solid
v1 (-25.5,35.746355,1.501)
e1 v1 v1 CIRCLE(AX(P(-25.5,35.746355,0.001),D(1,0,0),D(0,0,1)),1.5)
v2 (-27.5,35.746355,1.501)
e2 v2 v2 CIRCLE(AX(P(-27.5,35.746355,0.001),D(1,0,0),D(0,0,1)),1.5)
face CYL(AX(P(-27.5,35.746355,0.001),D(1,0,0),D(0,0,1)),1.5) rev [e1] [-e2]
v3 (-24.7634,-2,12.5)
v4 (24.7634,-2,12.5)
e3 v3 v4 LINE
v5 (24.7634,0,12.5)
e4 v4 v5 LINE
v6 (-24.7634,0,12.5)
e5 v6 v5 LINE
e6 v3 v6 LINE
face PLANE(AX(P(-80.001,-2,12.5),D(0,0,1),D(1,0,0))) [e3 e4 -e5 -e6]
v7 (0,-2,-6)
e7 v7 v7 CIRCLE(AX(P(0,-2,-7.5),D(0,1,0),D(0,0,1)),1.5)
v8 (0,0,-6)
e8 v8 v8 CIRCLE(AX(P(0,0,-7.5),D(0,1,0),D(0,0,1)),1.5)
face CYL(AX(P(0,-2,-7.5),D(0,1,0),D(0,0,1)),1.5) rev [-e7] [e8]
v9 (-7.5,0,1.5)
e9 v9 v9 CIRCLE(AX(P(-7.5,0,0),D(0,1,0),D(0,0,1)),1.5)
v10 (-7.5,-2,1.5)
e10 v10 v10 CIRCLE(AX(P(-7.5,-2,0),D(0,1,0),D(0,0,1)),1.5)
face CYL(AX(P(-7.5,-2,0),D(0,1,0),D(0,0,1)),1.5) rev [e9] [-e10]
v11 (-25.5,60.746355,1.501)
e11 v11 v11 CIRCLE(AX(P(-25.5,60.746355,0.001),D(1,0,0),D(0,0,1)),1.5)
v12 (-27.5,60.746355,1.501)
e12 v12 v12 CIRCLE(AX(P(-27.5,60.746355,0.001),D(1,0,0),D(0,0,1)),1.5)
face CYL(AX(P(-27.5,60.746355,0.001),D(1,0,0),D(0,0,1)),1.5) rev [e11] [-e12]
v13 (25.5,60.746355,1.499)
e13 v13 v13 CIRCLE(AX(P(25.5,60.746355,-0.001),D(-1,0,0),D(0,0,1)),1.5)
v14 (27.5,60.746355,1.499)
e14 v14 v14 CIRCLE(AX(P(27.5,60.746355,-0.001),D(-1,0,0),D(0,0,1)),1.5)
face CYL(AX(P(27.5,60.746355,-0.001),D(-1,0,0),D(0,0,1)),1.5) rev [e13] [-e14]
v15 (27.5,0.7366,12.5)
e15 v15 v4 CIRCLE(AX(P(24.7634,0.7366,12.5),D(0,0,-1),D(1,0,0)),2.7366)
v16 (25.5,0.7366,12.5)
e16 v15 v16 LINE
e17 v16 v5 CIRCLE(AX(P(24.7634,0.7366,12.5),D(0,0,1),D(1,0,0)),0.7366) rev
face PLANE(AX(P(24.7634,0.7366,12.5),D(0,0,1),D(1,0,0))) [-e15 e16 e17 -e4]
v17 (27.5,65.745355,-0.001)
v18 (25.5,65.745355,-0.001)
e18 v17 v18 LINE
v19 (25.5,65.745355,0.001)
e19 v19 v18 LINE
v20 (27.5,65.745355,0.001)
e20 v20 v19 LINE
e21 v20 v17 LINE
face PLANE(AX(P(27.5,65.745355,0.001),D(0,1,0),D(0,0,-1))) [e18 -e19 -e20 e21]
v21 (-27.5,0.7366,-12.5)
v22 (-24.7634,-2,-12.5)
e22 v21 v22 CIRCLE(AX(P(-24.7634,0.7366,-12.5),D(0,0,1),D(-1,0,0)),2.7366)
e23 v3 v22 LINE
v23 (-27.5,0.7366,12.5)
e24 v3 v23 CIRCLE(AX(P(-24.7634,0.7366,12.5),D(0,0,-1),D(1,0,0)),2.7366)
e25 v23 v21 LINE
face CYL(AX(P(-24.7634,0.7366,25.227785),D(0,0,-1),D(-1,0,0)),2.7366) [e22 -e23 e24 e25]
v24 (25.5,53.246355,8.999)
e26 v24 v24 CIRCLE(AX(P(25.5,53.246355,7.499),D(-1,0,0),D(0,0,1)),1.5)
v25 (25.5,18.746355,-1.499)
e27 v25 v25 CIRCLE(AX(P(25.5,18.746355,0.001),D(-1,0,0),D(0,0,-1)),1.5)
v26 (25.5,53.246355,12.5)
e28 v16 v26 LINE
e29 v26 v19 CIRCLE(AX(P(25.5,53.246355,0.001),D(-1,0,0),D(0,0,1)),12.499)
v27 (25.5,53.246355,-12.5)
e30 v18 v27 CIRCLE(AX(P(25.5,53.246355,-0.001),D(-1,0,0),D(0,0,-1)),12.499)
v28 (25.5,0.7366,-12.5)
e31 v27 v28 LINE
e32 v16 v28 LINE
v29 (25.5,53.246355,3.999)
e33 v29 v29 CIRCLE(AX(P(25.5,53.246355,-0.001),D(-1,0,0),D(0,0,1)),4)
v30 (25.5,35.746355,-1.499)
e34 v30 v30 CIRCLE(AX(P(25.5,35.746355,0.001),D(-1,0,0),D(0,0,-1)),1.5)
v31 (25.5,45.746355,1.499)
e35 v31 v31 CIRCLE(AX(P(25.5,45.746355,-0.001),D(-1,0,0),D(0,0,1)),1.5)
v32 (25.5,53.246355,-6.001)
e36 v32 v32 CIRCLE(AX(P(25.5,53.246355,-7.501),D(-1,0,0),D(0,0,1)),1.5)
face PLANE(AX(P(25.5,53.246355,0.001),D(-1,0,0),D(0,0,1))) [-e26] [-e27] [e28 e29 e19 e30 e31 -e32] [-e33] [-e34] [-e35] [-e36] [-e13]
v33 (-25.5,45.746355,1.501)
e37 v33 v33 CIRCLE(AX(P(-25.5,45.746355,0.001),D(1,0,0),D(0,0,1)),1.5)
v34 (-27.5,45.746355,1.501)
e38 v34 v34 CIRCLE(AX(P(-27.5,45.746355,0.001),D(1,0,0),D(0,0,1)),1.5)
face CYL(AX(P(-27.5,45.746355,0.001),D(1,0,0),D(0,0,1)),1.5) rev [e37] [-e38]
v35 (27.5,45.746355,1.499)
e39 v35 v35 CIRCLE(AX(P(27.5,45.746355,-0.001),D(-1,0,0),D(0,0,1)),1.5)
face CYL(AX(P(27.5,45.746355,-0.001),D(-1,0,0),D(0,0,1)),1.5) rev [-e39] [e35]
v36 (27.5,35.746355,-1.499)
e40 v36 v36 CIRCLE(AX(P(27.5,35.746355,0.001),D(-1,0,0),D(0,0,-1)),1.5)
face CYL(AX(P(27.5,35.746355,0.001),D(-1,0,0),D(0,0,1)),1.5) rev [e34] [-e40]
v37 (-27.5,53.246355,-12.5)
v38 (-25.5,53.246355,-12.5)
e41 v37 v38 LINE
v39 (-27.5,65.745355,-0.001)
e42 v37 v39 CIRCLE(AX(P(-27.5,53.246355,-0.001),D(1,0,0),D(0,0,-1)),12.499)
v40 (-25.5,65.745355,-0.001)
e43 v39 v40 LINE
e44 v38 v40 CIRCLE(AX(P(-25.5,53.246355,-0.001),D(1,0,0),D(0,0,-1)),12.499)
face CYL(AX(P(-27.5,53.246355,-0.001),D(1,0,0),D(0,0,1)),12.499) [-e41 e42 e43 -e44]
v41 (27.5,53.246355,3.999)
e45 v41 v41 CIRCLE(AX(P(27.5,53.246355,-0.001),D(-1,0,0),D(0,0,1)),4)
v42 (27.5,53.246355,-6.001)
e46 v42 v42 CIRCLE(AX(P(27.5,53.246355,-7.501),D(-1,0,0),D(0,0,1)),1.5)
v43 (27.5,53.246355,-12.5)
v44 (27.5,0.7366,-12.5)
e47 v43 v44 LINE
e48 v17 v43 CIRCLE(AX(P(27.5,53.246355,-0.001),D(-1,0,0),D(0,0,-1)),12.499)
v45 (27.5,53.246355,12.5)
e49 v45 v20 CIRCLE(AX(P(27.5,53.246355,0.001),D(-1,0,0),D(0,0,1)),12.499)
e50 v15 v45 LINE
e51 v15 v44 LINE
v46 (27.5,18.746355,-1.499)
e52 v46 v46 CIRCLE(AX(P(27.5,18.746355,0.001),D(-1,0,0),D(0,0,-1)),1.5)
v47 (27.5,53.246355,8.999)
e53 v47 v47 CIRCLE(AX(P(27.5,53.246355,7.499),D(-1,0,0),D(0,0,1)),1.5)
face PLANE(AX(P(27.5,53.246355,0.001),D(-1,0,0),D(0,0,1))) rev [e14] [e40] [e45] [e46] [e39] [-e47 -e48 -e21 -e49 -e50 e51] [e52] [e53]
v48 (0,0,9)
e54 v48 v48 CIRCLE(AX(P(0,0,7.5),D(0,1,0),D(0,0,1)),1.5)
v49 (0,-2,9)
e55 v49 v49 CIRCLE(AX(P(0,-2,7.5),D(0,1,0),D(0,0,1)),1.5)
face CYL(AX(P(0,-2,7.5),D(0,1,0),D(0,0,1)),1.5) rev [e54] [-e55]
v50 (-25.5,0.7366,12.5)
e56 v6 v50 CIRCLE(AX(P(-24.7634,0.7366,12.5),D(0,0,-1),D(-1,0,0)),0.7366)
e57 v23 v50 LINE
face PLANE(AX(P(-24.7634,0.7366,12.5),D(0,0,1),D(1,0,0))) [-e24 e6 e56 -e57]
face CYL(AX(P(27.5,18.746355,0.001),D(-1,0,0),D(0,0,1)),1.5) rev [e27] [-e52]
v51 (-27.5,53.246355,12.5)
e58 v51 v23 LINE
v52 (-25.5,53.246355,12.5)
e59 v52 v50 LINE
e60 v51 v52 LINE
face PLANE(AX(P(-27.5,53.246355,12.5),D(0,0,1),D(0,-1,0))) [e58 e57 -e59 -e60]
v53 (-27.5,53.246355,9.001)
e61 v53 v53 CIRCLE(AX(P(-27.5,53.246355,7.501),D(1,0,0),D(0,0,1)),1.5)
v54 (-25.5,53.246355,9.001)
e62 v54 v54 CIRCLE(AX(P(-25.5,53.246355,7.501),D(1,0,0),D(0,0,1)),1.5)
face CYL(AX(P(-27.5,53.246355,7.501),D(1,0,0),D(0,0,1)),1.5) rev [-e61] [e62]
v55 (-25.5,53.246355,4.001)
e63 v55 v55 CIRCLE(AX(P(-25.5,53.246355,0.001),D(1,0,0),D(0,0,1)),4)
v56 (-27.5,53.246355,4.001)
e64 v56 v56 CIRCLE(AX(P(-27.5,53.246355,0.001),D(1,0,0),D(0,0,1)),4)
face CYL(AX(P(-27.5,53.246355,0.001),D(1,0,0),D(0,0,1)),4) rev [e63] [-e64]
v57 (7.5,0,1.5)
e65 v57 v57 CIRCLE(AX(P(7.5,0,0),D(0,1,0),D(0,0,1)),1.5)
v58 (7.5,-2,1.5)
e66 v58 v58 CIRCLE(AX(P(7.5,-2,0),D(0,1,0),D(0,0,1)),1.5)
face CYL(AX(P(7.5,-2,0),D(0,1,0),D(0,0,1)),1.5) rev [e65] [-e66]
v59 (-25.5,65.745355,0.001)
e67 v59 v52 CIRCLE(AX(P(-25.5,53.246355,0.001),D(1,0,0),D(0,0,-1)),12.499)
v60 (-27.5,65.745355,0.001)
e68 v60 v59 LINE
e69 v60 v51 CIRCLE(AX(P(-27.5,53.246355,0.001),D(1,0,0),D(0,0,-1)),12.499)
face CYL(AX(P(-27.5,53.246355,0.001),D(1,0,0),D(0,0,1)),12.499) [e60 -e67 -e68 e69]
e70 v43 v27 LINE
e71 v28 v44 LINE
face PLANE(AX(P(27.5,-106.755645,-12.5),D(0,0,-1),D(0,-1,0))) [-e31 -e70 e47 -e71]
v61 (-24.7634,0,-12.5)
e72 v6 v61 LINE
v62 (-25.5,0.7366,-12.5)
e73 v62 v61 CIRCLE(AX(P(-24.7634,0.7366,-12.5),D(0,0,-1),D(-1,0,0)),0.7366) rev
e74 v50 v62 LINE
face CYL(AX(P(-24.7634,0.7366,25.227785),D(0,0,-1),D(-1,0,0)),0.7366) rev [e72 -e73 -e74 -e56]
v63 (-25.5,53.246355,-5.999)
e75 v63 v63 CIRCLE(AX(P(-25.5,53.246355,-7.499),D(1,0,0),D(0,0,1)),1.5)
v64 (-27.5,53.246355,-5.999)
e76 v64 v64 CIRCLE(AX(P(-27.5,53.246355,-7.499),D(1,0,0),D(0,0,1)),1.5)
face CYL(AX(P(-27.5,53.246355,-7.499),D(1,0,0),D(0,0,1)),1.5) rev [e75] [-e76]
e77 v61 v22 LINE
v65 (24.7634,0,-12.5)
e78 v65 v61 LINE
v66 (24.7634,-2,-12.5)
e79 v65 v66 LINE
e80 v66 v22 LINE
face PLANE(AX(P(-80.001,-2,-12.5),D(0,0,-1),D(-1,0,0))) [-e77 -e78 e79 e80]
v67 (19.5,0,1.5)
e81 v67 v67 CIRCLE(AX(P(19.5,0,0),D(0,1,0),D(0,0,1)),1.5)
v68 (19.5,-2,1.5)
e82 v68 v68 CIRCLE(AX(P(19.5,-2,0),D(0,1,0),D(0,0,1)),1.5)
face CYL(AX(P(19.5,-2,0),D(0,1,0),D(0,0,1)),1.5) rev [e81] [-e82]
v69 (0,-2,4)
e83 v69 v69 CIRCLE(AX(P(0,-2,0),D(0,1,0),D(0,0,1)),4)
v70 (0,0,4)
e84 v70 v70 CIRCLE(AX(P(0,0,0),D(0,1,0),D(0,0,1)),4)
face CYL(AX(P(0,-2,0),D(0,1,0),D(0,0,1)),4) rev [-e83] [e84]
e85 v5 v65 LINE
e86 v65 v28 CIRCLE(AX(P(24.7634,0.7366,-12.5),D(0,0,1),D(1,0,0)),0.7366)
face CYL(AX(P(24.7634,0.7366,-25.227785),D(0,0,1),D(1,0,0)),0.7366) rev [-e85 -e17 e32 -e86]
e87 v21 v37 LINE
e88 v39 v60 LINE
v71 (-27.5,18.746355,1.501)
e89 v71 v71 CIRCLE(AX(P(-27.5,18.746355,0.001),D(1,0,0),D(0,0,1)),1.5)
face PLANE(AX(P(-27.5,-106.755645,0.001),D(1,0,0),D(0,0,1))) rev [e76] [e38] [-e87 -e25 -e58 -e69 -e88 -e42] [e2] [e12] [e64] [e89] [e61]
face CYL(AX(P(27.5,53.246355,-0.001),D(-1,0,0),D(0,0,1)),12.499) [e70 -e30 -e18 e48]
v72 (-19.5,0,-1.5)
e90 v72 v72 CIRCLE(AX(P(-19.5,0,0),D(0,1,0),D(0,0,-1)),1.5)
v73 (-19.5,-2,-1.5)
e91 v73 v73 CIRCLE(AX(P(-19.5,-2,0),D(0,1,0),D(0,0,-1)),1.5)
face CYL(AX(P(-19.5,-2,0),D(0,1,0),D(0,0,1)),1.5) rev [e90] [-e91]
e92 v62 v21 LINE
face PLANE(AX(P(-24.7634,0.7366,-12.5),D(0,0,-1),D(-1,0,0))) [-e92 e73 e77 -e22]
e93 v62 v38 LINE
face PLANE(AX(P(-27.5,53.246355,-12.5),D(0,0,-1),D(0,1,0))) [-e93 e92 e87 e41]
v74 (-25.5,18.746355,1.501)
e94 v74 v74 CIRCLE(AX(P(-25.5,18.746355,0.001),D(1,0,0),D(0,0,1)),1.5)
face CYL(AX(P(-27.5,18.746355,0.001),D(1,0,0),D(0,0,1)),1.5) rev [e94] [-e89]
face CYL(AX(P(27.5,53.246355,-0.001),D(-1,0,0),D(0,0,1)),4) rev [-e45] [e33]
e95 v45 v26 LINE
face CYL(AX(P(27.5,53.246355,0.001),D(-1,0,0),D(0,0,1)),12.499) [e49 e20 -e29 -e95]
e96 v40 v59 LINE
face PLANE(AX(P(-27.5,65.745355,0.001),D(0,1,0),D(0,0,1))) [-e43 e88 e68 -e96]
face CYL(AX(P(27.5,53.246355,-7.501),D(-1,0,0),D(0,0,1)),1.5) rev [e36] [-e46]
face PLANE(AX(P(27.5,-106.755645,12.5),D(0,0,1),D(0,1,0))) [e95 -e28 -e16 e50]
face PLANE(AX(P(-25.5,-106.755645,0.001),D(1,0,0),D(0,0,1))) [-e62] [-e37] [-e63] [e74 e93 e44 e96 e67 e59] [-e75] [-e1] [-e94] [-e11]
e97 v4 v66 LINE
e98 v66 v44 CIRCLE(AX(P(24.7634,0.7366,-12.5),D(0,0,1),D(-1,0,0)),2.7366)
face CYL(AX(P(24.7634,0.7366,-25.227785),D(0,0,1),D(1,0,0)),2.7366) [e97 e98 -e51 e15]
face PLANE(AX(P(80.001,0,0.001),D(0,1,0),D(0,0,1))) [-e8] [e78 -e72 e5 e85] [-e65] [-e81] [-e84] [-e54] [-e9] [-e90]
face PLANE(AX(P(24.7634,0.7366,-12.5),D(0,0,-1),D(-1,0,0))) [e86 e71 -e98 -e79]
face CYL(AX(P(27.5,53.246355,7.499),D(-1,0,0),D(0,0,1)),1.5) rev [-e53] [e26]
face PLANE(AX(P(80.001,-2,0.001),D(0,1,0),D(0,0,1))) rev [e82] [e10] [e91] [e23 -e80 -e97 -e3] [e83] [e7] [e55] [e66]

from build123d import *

# Parameters (mm, degrees)
SKETCH1_R                  = 4
SKETCH1_R_2                = 1.5
BASE_FLANGE1_DEPTH         = 2
SKETCHED_START             = -92.5
SKETCHED_BEND1_OUTLINE_W   = 2
SKETCHED_BEND1_OUTLINE_H   = 25
SKETCHED_BEND1_DEPTH       = 65
SKETCHED_START_2           = 27.5
SKETCHED_BEND1_2_OUTLINE_W = 2
SKETCHED_BEND1_2_OUTLINE_H = 25
SKETCHED_BEND1_2_DEPTH     = 65
SKETCHED_START_3           = -27.5
SKETCHED_BEND1_3_OUTLINE_R = 1.5
SKETCHED_BEND1_3_DEPTH     = 2.7366
SKETCHED_START_4           = 24.7634
SKETCHED_BEND1_4_OUTLINE_R = 1.5
SKETCHED_BEND1_4_DEPTH     = 2.7366
SKETCHED_BEND1_5_DEPTH     = 2
SKETCHED_START_5           = 25.5
SKETCHED_BEND1_6_DEPTH     = 2
SKETCHED_START_6           = -12.5
SKETCHED_BEND1_7_DEPTH     = 25


with BuildPart() as part:
    # Base-Flange1: sheet metal written as solids
    # Sketch1 → Base-Flange1 (new body)
    with BuildSketch(Plane(origin=(0, 0, 0), x_dir=(1, 0, 0), z_dir=(0, 1, 0))):
        with BuildLine():
            Line((-92.5, -0.001), (-92.5, 0.001))
            ThreePointArc((-92.5, 0.001), (-88.839127658, 8.839127658), (-80.001, 12.5))
            Line((-80.001, 12.5), (80.001, 12.5))
            ThreePointArc((80.001, 12.5), (88.839127658, 8.839127658), (92.5, 0.001))
            Line((92.5, 0.001), (92.5, -0.001))
            ThreePointArc((92.5, -0.001), (88.839127658, -8.839127658), (80.001, -12.5))
            Line((80.001, -12.5), (-80.001, -12.5))
            ThreePointArc((-80.001, -12.5), (-88.839127658, -8.839127658), (-92.5, -0.001))
        make_face()
        with Locations(Location((0, 0, 0), (0, 0, 270))):
            Circle(SKETCH1_R, mode=Mode.SUBTRACT)
        with Locations(Location((0, 7.5, 0), (0, 0, 270))):
            Circle(SKETCH1_R_2, mode=Mode.SUBTRACT)
        with Locations(Location((7.5, 0, 0), (0, 0, 270))):
            Circle(SKETCH1_R_2, mode=Mode.SUBTRACT)
        with Locations(Location((0, -7.5, 0), (0, 0, 270))):
            Circle(SKETCH1_R_2, mode=Mode.SUBTRACT)
        with Locations(Location((-7.5, 0, 0), (0, 0, 270))):
            Circle(SKETCH1_R_2, mode=Mode.SUBTRACT)
        with Locations(Location((72.501, 0.001, 0), (0, 0, 270))):
            Circle(SKETCH1_R_2, mode=Mode.SUBTRACT)
        with Locations(Location((80.001, 0.001, 0), (0, 0, 270))):
            Circle(SKETCH1_R, mode=Mode.SUBTRACT)
        with Locations(Location((80.001, -7.499, 0), (0, 0, 270))):
            Circle(SKETCH1_R_2, mode=Mode.SUBTRACT)
        with Locations(Location((87.501, 0.001, 0), (0, 0, 270))):
            Circle(SKETCH1_R_2, mode=Mode.SUBTRACT)
        with Locations(Location((80.001, 7.501, 0), (0, 0, 270))):
            Circle(SKETCH1_R_2, mode=Mode.SUBTRACT)
        with Locations(Location((-80.001, 7.499, 0), (0, 0, 270))):
            Circle(SKETCH1_R_2, mode=Mode.SUBTRACT)
        with Locations(Location((-87.501, -0.001, 0), (0, 0, 270))):
            Circle(SKETCH1_R_2, mode=Mode.SUBTRACT)
        with Locations(Location((-80.001, -0.001, 0), (0, 0, 270))):
            Circle(SKETCH1_R, mode=Mode.SUBTRACT)
        with Locations(Location((-72.501, -0.001, 0), (0, 0, 270))):
            Circle(SKETCH1_R_2, mode=Mode.SUBTRACT)
        with Locations(Location((-80.001, -7.501, 0), (0, 0, 270))):
            Circle(SKETCH1_R_2, mode=Mode.SUBTRACT)
        with Locations(Location((-62.501, -0.001, 0), (0, 0, 270))):
            Circle(SKETCH1_R_2, mode=Mode.SUBTRACT)
        with Locations(Location((-45.501, -0.001, 0), (0, 0, 270))):
            Circle(SKETCH1_R_2, mode=Mode.SUBTRACT)
        with Locations(Location((45.501, -0.001, 0), (0, 0, 90))):
            Circle(SKETCH1_R_2, mode=Mode.SUBTRACT)
        with Locations(Location((62.501, -0.001, 0), (0, 0, 90))):
            Circle(SKETCH1_R_2, mode=Mode.SUBTRACT)
        with Locations(Location((19.5, 0, 0), (0, 0, 270))):
            Circle(SKETCH1_R_2, mode=Mode.SUBTRACT)
        with Locations(Location((-19.5, 0, 0), (0, 0, 90))):
            Circle(SKETCH1_R_2, mode=Mode.SUBTRACT)
    extrude(amount=-BASE_FLANGE1_DEPTH)

    # Sketched Bend1: read off the stored shape, not the designer's step
    # Sketched Bend1 outline → Sketched Bend1 (cut)
    with BuildSketch(Plane.YZ.offset(SKETCHED_START)):
        with Locations((-1, 0)):
            Rectangle(SKETCHED_BEND1_OUTLINE_W, SKETCHED_BEND1_OUTLINE_H)
    extrude(amount=SKETCHED_BEND1_DEPTH, mode=Mode.SUBTRACT)

    # Sketched Bend1 2 outline → Sketched Bend1 2 (cut)
    with BuildSketch(Plane.YZ.offset(SKETCHED_START_2)):
        with Locations((-1, 0)):
            Rectangle(SKETCHED_BEND1_2_OUTLINE_W, SKETCHED_BEND1_2_OUTLINE_H)
    extrude(amount=SKETCHED_BEND1_2_DEPTH, mode=Mode.SUBTRACT)

    # Sketched Bend1 3 outline → Sketched Bend1 3 (add)
    with BuildSketch(Plane.YZ.offset(SKETCHED_START_3)):
        with BuildLine():
            Line((0, 12.5), (0, -12.5))
            Line((0, -12.5), (53.246355099, -12.5))
            ThreePointArc((53.246355099, -12.5), (62.084482757, -8.839127658), (65.745355099, -0.001))
            Line((65.745355099, -0.001), (65.745355099, 0.001))
            ThreePointArc((65.745355099, 0.001), (62.084482757, 8.839127658), (53.246355099, 12.5))
            Line((53.246355099, 12.5), (0, 12.5))
        make_face()
        with BuildLine():
            ThreePointArc((54.746353766, -7.499000002), (53.246855098, -9.000999917), (51.746355432, -7.5))
            ThreePointArc((51.746355432, -7.5), (53.245855099, -5.999000083), (54.746353766, -7.499000002))
        make_face(mode=Mode.SUBTRACT)
        with Locations((18.746355099, 0.001)):
            Circle(SKETCHED_BEND1_3_OUTLINE_R, mode=Mode.SUBTRACT)
        with Locations((35.746355099, 0.001)):
            Circle(SKETCHED_BEND1_3_OUTLINE_R, mode=Mode.SUBTRACT)
        with BuildLine():
            ThreePointArc((47.246353766, 0.000999998), (45.746855098, -1.500999917), (44.246355432, 0))
            ThreePointArc((44.246355432, 0), (45.745855099, 1.500999917), (47.246353766, 0.000999998))
        make_face(mode=Mode.SUBTRACT)
        with BuildLine():
            ThreePointArc((57.246354599, 0.001), (53.246855099, -4.000999969), (49.246355224, 0))
            ThreePointArc((49.246355224, 0), (53.245855099, 4.000999969), (57.246354599, 0.001))
        make_face(mode=Mode.SUBTRACT)
        with BuildLine():
            ThreePointArc((62.246353766, 0.000999998), (60.746855098, -1.500999917), (59.246355432, 0))
            ThreePointArc((59.246355432, 0), (60.745855099, 1.500999917), (62.246353766, 0.000999998))
        make_face(mode=Mode.SUBTRACT)
        with BuildLine():
            ThreePointArc((54.746353766, 7.500999998), (53.246855098, 5.999000083), (51.746355432, 7.5))
            ThreePointArc((51.746355432, 7.5), (53.245855099, 9.000999917), (54.746353766, 7.500999998))
        make_face(mode=Mode.SUBTRACT)
    extrude(amount=SKETCHED_BEND1_3_DEPTH)

    # Sketched Bend1 4 outline → Sketched Bend1 4 (add)
    with BuildSketch(Plane.YZ.offset(SKETCHED_START_4)):
        with BuildLine():
            Line((0, 12.5), (0, -12.5))
            Line((0, -12.5), (53.246355099, -12.5))
            ThreePointArc((53.246355099, -12.5), (62.084482757, -8.839127658), (65.745355099, -0.001))
            Line((65.745355099, -0.001), (65.745355099, 0.001))
            ThreePointArc((65.745355099, 0.001), (62.084482757, 8.839127658), (53.246355099, 12.5))
            Line((53.246355099, 12.5), (0, 12.5))
        make_face()
        with BuildLine():
            ThreePointArc((54.746353766, -7.499000002), (53.246855098, -9.000999917), (51.746355432, -7.5))
            ThreePointArc((51.746355432, -7.5), (53.245855099, -5.999000083), (54.746353766, -7.499000002))
        make_face(mode=Mode.SUBTRACT)
        with Locations((18.746355099, 0.001)):
            Circle(SKETCHED_BEND1_4_OUTLINE_R, mode=Mode.SUBTRACT)
        with Locations((35.746355099, 0.001)):
            Circle(SKETCHED_BEND1_4_OUTLINE_R, mode=Mode.SUBTRACT)
        with BuildLine():
            ThreePointArc((47.246353766, 0.000999998), (45.746855098, -1.500999917), (44.246355432, 0))
            ThreePointArc((44.246355432, 0), (45.745855099, 1.500999917), (47.246353766, 0.000999998))
        make_face(mode=Mode.SUBTRACT)
        with BuildLine():
            ThreePointArc((57.246354599, 0.001), (53.246855099, -4.000999969), (49.246355224, 0))
            ThreePointArc((49.246355224, 0), (53.245855099, 4.000999969), (57.246354599, 0.001))
        make_face(mode=Mode.SUBTRACT)
        with BuildLine():
            ThreePointArc((62.246353766, 0.000999998), (60.746855098, -1.500999917), (59.246355432, 0))
            ThreePointArc((59.246355432, 0), (60.745855099, 1.500999917), (62.246353766, 0.000999998))
        make_face(mode=Mode.SUBTRACT)
        with BuildLine():
            ThreePointArc((54.746353766, 7.500999998), (53.246855098, 5.999000083), (51.746355432, 7.5))
            ThreePointArc((51.746355432, 7.5), (53.245855099, 9.000999917), (54.746353766, 7.500999998))
        make_face(mode=Mode.SUBTRACT)
    extrude(amount=SKETCHED_BEND1_4_DEPTH)

    # Sketched Bend1 5 outline → Sketched Bend1 5 (add)
    with BuildSketch(Plane.YZ.offset(SKETCHED_START_3)):
        with BuildLine():
            ThreePointArc((44.246355432, 0), (45.745855099, -1.500999917), (47.246355099, -0.001))
            ThreePointArc((47.246355099, -0.001), (45.7458551, -1.498999917), (44.246355432, 0))
        make_face()
        with BuildLine():
            ThreePointArc((51.746355432, 7.5), (53.245855099, 5.999000083), (54.746355099, 7.499))
            ThreePointArc((54.746355099, 7.499), (53.2458551, 6.001000083), (51.746355432, 7.5))
        make_face()
        with BuildLine():
            ThreePointArc((59.246355432, 0), (60.745855099, -1.500999917), (62.246355099, -0.001))
            ThreePointArc((62.246355099, -0.001), (60.7458551, -1.498999917), (59.246355432, 0))
        make_face()
        with BuildLine():
            ThreePointArc((51.746355432, -7.5), (53.245855099, -9.000999917), (54.746355099, -7.501))
            ThreePointArc((54.746355099, -7.501), (53.2458551, -8.998999917), (51.746355432, -7.5))
        make_face()
        with BuildLine():
            ThreePointArc((49.246355224, 0), (53.245855099, -4.000999969), (57.246355099, -0.001))
            ThreePointArc((57.246355099, -0.001), (53.245855099, -3.998999969), (49.246355224, 0))
        make_face()
    extrude(amount=SKETCHED_BEND1_5_DEPTH)

    # Sketched Bend1 6 outline → Sketched Bend1 6 (add)
    with BuildSketch(Plane.YZ.offset(SKETCHED_START_5)):
        with BuildLine():
            ThreePointArc((44.246355432, 0), (45.7458551, 1.498999917), (47.246353766, 0.000999998))
            ThreePointArc((47.246353766, 0.000999998), (45.745855099, 1.500999917), (44.246355432, 0))
        make_face()
        with BuildLine():
            ThreePointArc((51.746355432, 7.5), (53.2458551, 8.998999917), (54.746353766, 7.500999998))
            ThreePointArc((54.746353766, 7.500999998), (53.245855099, 9.000999917), (51.746355432, 7.5))
        make_face()
        with BuildLine():
            ThreePointArc((59.246355432, 0), (60.7458551, 1.498999917), (62.246353766, 0.000999998))
            ThreePointArc((62.246353766, 0.000999998), (60.745855099, 1.500999917), (59.246355432, 0))
        make_face()
        with BuildLine():
            ThreePointArc((51.746355432, -7.5), (53.2458551, -6.001000083), (54.746353766, -7.499000002))
            ThreePointArc((54.746353766, -7.499000002), (53.245855099, -5.999000083), (51.746355432, -7.5))
        make_face()
        with BuildLine():
            ThreePointArc((49.246355224, 0), (53.245855099, 3.998999969), (57.246354599, 0.001))
            ThreePointArc((57.246354599, 0.001), (53.245855099, 4.000999969), (49.246355224, 0))
        make_face()
    extrude(amount=SKETCHED_BEND1_6_DEPTH)

    # Sketched Bend1 7 outline → Sketched Bend1 7 (cut)
    with BuildSketch(Plane.XY.offset(SKETCHED_START_6)):
        with BuildLine():
            Line((25.5, 0.7366), (25.5, 65.745355099))
            Line((25.5, 65.745355099), (24.7634, 65.745355099))
            Line((24.7634, 65.745355099), (24.7634, 0))
            ThreePointArc((24.7634, 0), (25.284254855, 0.215745145), (25.5, 0.7366))
        make_face()
        with BuildLine():
            Line((-24.7634, 65.745355099), (-25.5, 65.745355099))
            Line((-25.5, 65.745355099), (-25.5, 0.7366))
            ThreePointArc((-25.5, 0.7366), (-25.284254855, 0.215745145), (-24.7634, 0))
            Line((-24.7634, 0), (-24.7634, 65.745355099))
        make_face()
        with BuildLine():
            Line((-27.5, -2), (-24.7634, -2))
            ThreePointArc((-24.7634, -2), (-26.698468417, -1.198468417), (-27.5, 0.7366))
            Line((-27.5, 0.7366), (-27.5, -2))
        make_face()
        with BuildLine():
            ThreePointArc((27.5, 0.7366), (26.698468417, -1.198468417), (24.7634, -2))
            Line((24.7634, -2), (27.5, -2))
            Line((27.5, -2), (27.5, 0.7366))
        make_face()
    extrude(amount=SKETCHED_BEND1_7_DEPTH, mode=Mode.SUBTRACT)


solid = part.part
